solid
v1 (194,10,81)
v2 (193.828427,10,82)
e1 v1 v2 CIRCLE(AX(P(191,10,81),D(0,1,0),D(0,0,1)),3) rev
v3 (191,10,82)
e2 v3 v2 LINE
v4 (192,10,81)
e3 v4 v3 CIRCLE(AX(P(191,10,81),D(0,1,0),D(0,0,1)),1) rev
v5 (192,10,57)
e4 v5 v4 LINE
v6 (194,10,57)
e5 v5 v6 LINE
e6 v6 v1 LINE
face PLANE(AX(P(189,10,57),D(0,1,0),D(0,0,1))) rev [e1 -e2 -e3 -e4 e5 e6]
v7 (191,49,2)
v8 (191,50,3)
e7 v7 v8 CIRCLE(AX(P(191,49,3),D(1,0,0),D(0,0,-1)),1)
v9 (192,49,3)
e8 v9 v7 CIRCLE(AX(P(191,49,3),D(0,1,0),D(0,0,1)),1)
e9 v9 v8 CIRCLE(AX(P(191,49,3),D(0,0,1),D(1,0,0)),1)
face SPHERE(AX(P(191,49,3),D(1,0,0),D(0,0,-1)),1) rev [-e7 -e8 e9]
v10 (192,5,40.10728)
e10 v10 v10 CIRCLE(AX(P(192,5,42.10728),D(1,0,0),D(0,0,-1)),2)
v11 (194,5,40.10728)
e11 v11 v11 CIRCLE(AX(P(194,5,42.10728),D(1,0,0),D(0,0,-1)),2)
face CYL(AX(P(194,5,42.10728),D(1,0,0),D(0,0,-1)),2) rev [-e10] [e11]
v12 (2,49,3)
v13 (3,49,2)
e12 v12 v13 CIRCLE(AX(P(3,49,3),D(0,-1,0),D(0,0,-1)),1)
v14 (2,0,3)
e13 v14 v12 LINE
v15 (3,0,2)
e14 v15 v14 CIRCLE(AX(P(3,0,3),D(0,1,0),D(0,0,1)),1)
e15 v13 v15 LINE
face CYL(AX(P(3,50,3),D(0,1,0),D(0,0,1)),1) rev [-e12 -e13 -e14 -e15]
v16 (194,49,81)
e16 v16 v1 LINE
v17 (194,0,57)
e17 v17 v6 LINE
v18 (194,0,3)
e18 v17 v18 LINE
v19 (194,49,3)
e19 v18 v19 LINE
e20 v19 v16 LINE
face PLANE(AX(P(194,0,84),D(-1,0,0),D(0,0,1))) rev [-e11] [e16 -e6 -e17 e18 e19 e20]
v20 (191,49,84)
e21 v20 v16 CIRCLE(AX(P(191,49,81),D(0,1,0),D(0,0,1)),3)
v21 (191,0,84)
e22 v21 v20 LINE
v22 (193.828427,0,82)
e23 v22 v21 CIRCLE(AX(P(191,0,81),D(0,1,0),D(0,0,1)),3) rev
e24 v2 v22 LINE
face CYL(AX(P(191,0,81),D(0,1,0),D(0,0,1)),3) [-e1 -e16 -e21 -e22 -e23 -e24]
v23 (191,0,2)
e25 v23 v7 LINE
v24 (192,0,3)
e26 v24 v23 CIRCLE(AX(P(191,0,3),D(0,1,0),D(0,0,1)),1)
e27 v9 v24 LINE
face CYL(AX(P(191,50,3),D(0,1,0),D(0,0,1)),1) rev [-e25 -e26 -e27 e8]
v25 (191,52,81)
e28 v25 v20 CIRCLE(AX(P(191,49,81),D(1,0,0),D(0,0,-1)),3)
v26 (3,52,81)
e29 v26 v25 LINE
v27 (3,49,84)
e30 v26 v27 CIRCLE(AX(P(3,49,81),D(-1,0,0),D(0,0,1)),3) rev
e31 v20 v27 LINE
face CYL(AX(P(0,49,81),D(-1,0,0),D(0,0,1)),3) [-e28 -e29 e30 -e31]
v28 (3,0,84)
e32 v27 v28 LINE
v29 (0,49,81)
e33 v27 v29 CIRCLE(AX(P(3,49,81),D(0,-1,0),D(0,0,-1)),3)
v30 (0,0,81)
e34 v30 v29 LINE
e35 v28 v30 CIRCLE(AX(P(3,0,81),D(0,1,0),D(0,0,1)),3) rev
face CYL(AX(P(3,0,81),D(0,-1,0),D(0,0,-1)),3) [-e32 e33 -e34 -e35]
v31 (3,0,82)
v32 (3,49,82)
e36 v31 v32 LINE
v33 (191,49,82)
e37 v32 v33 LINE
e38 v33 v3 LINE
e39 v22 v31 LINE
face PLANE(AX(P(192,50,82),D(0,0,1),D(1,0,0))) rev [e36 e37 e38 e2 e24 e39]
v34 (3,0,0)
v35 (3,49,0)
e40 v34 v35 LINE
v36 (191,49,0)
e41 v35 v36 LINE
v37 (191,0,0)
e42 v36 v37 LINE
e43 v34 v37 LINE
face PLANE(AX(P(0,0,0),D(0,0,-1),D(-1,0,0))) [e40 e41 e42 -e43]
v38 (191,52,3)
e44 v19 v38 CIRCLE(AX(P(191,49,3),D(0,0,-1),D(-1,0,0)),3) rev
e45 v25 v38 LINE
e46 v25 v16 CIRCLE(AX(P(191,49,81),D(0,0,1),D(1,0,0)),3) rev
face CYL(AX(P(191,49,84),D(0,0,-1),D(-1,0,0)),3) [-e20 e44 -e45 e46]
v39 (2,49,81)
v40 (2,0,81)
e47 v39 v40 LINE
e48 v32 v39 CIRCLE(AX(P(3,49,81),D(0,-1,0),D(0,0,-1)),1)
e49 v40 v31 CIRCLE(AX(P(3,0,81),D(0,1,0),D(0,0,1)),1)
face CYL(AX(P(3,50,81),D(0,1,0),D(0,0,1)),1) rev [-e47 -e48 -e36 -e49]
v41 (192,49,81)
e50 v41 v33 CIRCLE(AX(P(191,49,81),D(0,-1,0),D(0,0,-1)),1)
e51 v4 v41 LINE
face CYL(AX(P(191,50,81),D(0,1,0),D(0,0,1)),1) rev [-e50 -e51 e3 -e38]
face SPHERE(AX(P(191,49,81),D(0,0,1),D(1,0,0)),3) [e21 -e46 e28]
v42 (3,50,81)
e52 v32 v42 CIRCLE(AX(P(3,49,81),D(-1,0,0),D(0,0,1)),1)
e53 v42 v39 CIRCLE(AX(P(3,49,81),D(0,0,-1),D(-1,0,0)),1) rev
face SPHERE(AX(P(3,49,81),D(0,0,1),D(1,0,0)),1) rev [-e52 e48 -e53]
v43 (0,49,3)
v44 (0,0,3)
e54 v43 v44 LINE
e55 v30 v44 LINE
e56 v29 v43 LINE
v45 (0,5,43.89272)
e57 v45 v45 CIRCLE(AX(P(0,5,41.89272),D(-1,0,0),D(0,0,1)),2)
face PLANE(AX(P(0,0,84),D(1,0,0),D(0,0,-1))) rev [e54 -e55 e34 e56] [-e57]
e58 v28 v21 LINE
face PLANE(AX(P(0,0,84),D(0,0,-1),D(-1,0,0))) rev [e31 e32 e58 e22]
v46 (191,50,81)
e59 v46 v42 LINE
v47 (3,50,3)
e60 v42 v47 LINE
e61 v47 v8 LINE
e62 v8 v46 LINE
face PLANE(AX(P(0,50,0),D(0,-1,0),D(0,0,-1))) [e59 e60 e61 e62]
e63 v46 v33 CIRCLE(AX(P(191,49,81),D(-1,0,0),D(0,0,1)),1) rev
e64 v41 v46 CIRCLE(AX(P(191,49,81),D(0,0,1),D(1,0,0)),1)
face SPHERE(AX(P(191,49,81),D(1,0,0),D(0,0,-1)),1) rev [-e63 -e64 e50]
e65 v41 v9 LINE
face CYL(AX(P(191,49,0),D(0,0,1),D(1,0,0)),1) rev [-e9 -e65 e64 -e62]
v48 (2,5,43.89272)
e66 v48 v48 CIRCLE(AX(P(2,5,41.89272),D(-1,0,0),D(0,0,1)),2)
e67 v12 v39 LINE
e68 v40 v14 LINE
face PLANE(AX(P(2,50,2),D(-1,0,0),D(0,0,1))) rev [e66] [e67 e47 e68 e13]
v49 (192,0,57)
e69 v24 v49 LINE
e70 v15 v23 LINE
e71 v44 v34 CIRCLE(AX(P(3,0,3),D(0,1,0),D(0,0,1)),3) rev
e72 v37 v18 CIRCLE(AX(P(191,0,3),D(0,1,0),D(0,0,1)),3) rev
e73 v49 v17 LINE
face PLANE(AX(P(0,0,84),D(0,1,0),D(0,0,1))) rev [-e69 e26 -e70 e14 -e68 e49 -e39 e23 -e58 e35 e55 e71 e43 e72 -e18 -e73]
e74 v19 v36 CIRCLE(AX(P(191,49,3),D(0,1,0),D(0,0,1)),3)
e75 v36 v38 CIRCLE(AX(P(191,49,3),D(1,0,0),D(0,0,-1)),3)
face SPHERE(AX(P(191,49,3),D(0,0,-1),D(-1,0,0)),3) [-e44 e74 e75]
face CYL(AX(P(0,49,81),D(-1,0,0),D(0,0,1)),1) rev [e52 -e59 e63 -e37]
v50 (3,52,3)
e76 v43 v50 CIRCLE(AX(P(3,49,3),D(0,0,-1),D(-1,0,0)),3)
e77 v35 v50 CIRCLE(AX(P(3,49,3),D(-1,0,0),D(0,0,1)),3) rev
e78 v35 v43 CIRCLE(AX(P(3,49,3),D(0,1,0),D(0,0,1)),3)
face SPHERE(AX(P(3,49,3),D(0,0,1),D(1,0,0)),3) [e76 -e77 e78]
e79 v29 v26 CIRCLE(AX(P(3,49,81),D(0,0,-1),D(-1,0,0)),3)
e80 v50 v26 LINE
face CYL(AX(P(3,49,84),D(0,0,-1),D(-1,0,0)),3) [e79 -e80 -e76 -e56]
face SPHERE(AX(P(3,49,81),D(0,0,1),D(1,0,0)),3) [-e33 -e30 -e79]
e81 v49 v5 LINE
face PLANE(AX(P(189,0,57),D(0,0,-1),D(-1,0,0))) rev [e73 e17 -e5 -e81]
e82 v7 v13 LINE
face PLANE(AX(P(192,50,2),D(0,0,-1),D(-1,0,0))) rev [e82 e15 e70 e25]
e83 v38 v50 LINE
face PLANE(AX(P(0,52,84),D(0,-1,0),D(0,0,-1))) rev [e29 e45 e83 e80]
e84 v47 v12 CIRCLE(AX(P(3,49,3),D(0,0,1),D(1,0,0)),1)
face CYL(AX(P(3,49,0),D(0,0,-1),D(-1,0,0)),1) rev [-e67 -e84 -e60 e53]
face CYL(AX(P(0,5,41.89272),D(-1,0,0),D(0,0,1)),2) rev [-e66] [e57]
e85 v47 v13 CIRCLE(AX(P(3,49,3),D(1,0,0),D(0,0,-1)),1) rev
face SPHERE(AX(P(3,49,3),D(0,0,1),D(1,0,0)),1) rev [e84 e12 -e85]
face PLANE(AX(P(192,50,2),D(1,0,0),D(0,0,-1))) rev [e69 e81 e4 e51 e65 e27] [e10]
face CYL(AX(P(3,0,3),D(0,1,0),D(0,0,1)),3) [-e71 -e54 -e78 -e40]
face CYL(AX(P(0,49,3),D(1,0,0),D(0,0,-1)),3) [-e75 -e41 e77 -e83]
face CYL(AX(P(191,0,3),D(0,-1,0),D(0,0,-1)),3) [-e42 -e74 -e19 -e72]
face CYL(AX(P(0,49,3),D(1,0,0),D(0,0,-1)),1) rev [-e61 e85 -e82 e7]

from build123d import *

# Parameters (mm, degrees)
SKETCH1_W                 = 194
SKETCH1_H                 = 52
BOSS_EXTRUDE1_DEPTH       = 84
SKETCH2_W                 = 190
SKETCH2_H                 = 80
CUT_EXTRUDE1_DEPTH        = 50
FILLET1_R                 = 1
FILLET2_R                 = 1
FILLET3_R                 = 1
FILLET4_R                 = 3
FILLET5_R                 = 3
SKETCH3_W                 = 25
SKETCH3_H                 = 10
CUT_EXTRUDE2_DEPTH        = 5
F_4_0MM_DOWEL_HOLE1_D     = 4
F_4_0MM_DOWEL_HOLE1_DEPTH = 20
F_4_0MM_DOWEL_HOLE1_TIP   = 1.201721238
F_4_0MM_DOWEL_HOLE2_D     = 4
F_4_0MM_DOWEL_HOLE2_DEPTH = 20
F_4_0MM_DOWEL_HOLE2_TIP   = 1.201721238


with BuildPart() as part:
    # Sketch1 → Boss-Extrude1 (new body)
    with BuildSketch(Plane.XY):
        with Locations((97, 26)):
            Rectangle(SKETCH1_W, SKETCH1_H)
    extrude(amount=BOSS_EXTRUDE1_DEPTH)

    # Sketch2 → Cut-Extrude1 (cut)
    with BuildSketch(Plane.XZ):
        with Locations((97, 42)):
            Rectangle(SKETCH2_W, SKETCH2_H)
    extrude(amount=-CUT_EXTRUDE1_DEPTH, mode=Mode.SUBTRACT)

    # Fillet1
    fillet1_edges = [part.edges().sort_by_distance(p)[0] for p in [
        (97, 50, 2),
        (2, 50, 42),
        (2, 25, 2),
    ]]
    fillet(fillet1_edges, radius=FILLET1_R)

    # Fillet2
    fillet2_edges = [part.edges().sort_by_distance(p)[0] for p in [
        (97.5, 50, 82),
        (2, 24.5, 82),
        (2.292893219, 49.707106781, 82),
    ]]
    fillet(fillet2_edges, radius=FILLET2_R)

    # Fillet3
    fillet3_edges = [part.edges().sort_by_distance(p)[0] for p in [
        (192, 50, 42),
        (192, 24.5, 2),
        (192, 49.707106781, 2.292893219),
        (192, 24.5, 82),
        (192, 49.707106781, 81.707106781),
    ]]
    fillet(fillet3_edges, radius=FILLET3_R)

    # Fillet4
    fillet4_edges = [part.edges().sort_by_distance(p)[0] for p in [
        (194, 26, 84),
        (97, 52, 84),
        (0, 26, 84),
        (194, 52, 42),
    ]]
    fillet(fillet4_edges, radius=FILLET4_R)

    # Fillet5
    # the kernel refuses this fillet: 3 mm, written as the material it takes off along each edge
    with BuildSketch(Plane(origin=(3, 49, 81), x_dir=(0, 1, 0), z_dir=(-1, 0, 0))) as fillet5_piece_1_section:
        Polygon((0, 0), (FILLET5_R, 0), (FILLET5_R, -FILLET5_R), (0, -FILLET5_R), align=None)
    fillet5_piece_1 = extrude(amount=FILLET5_R, mode=Mode.PRIVATE)
    fillet5_piece_1 = fillet5_piece_1 - Plane(origin=(3, 49, 81), x_dir=(0, -0.7071067811865475, -0.7071067811865475), z_dir=(-1, 0, 0)) * Sphere(FILLET5_R, mode=Mode.PRIVATE)
    add(fillet5_piece_1, mode=Mode.SUBTRACT)
    with BuildSketch(Plane(origin=(3, 49, 3), x_dir=(0, 0, -1), z_dir=(-1, 0, 0))) as fillet5_piece_2_section:
        Polygon((0, 0), (FILLET5_R, 0), (FILLET5_R, -FILLET5_R), (0, -FILLET5_R), align=None)
    fillet5_piece_2 = extrude(amount=FILLET5_R, mode=Mode.PRIVATE)
    fillet5_piece_2 = fillet5_piece_2 - Plane(origin=(3, 49, 3), x_dir=(0, -0.7071067811865475, 0.7071067811865475), z_dir=(-1, 0, 0)) * Sphere(FILLET5_R, mode=Mode.PRIVATE)
    add(fillet5_piece_2, mode=Mode.SUBTRACT)
    with BuildSketch(Plane(origin=(194, -7.5, 0), x_dir=(-1, 0, 0), z_dir=(0, 1, 0))) as fillet5_piece_3:
        with BuildLine():
            CenterArc((FILLET5_R, FILLET5_R), FILLET5_R, 180, 90)
            Line((0, FILLET5_R), (0, 0))
            Line((0, 0), (FILLET5_R, 0))
        make_face()
    extrude(amount=56.5, mode=Mode.SUBTRACT)
    with BuildSketch(Plane(origin=(0, 49, 0), x_dir=(0, 0, 1), z_dir=(0, -1, 0))) as fillet5_piece_4:
        with BuildLine():
            CenterArc((FILLET5_R, -FILLET5_R), FILLET5_R, 90, 90)
            Line((0, -FILLET5_R), (0, 0))
            Line((0, 0), (FILLET5_R, 0))
        make_face()
    extrude(amount=56.5, mode=Mode.SUBTRACT)
    with BuildSketch(Plane(origin=(191, 52, 0), x_dir=(0, -1, 0), z_dir=(-1, 0, 0))) as fillet5_piece_5:
        with BuildLine():
            CenterArc((FILLET5_R, FILLET5_R), FILLET5_R, 180, 90)
            Line((0, FILLET5_R), (0, 0))
            Line((0, 0), (FILLET5_R, 0))
        make_face()
    extrude(amount=188, mode=Mode.SUBTRACT)
    with BuildSketch(Plane(origin=(0, 52, 3), x_dir=(0, -1, 0), z_dir=(0, 0, 1))) as fillet5_piece_6:
        with BuildLine():
            CenterArc((FILLET5_R, FILLET5_R), FILLET5_R, 180, 90)
            Line((0, FILLET5_R), (0, 0))
            Line((0, 0), (FILLET5_R, 0))
        make_face()
    extrude(amount=78, mode=Mode.SUBTRACT)
    with BuildSketch(Plane(origin=(191, 49, 0), x_dir=(1, 0, 0), z_dir=(0, -1, 0))) as fillet5_piece_7:
        with BuildLine():
            CenterArc((3 - FILLET5_R, FILLET5_R), FILLET5_R, 270, 90)
            Line((3, FILLET5_R), (3, 0))
            Line((3, 0), (3 - FILLET5_R, 0))
        make_face()
    revolve(axis=Axis((191, 49, 0), (0, 0, 1)), revolution_arc=90, mode=Mode.SUBTRACT)

    # Sketch3 → Cut-Extrude2 (cut)
    with BuildSketch(Plane(origin=(194, 0, 0), x_dir=(0, 0, -1), z_dir=(1, 0, 0))):
        with Locations((-69.5, 5)):
            Rectangle(SKETCH3_W, SKETCH3_H)
    extrude(amount=-CUT_EXTRUDE2_DEPTH, mode=Mode.SUBTRACT)

    # Ø4.0mm Dowel Hole1
    with Locations(Plane(origin=(194, 5, 42.107279869), x_dir=(0, 0, 1), z_dir=(1, 0, 0))):
        with Locations((0, 0)):
            Hole(F_4_0MM_DOWEL_HOLE1_D / 2, depth=F_4_0MM_DOWEL_HOLE1_DEPTH)
            with Locations((0, 0, -(F_4_0MM_DOWEL_HOLE1_DEPTH + F_4_0MM_DOWEL_HOLE1_TIP / 2))):  # 118° drill point
                Cone(0, F_4_0MM_DOWEL_HOLE1_D / 2, F_4_0MM_DOWEL_HOLE1_TIP, mode=Mode.SUBTRACT)

    # Ø4.0mm Dowel Hole2
    with Locations(Plane(origin=(0, 5, 41.892720131), x_dir=(0, 0, -1), z_dir=(-1, 0, 0))):
        with Locations((0, 0)):
            Hole(F_4_0MM_DOWEL_HOLE2_D / 2, depth=F_4_0MM_DOWEL_HOLE2_DEPTH)
            with Locations((0, 0, -(F_4_0MM_DOWEL_HOLE2_DEPTH + F_4_0MM_DOWEL_HOLE2_TIP / 2))):  # 118° drill point
                Cone(0, F_4_0MM_DOWEL_HOLE2_D / 2, F_4_0MM_DOWEL_HOLE2_TIP, mode=Mode.SUBTRACT)


solid = part.part
